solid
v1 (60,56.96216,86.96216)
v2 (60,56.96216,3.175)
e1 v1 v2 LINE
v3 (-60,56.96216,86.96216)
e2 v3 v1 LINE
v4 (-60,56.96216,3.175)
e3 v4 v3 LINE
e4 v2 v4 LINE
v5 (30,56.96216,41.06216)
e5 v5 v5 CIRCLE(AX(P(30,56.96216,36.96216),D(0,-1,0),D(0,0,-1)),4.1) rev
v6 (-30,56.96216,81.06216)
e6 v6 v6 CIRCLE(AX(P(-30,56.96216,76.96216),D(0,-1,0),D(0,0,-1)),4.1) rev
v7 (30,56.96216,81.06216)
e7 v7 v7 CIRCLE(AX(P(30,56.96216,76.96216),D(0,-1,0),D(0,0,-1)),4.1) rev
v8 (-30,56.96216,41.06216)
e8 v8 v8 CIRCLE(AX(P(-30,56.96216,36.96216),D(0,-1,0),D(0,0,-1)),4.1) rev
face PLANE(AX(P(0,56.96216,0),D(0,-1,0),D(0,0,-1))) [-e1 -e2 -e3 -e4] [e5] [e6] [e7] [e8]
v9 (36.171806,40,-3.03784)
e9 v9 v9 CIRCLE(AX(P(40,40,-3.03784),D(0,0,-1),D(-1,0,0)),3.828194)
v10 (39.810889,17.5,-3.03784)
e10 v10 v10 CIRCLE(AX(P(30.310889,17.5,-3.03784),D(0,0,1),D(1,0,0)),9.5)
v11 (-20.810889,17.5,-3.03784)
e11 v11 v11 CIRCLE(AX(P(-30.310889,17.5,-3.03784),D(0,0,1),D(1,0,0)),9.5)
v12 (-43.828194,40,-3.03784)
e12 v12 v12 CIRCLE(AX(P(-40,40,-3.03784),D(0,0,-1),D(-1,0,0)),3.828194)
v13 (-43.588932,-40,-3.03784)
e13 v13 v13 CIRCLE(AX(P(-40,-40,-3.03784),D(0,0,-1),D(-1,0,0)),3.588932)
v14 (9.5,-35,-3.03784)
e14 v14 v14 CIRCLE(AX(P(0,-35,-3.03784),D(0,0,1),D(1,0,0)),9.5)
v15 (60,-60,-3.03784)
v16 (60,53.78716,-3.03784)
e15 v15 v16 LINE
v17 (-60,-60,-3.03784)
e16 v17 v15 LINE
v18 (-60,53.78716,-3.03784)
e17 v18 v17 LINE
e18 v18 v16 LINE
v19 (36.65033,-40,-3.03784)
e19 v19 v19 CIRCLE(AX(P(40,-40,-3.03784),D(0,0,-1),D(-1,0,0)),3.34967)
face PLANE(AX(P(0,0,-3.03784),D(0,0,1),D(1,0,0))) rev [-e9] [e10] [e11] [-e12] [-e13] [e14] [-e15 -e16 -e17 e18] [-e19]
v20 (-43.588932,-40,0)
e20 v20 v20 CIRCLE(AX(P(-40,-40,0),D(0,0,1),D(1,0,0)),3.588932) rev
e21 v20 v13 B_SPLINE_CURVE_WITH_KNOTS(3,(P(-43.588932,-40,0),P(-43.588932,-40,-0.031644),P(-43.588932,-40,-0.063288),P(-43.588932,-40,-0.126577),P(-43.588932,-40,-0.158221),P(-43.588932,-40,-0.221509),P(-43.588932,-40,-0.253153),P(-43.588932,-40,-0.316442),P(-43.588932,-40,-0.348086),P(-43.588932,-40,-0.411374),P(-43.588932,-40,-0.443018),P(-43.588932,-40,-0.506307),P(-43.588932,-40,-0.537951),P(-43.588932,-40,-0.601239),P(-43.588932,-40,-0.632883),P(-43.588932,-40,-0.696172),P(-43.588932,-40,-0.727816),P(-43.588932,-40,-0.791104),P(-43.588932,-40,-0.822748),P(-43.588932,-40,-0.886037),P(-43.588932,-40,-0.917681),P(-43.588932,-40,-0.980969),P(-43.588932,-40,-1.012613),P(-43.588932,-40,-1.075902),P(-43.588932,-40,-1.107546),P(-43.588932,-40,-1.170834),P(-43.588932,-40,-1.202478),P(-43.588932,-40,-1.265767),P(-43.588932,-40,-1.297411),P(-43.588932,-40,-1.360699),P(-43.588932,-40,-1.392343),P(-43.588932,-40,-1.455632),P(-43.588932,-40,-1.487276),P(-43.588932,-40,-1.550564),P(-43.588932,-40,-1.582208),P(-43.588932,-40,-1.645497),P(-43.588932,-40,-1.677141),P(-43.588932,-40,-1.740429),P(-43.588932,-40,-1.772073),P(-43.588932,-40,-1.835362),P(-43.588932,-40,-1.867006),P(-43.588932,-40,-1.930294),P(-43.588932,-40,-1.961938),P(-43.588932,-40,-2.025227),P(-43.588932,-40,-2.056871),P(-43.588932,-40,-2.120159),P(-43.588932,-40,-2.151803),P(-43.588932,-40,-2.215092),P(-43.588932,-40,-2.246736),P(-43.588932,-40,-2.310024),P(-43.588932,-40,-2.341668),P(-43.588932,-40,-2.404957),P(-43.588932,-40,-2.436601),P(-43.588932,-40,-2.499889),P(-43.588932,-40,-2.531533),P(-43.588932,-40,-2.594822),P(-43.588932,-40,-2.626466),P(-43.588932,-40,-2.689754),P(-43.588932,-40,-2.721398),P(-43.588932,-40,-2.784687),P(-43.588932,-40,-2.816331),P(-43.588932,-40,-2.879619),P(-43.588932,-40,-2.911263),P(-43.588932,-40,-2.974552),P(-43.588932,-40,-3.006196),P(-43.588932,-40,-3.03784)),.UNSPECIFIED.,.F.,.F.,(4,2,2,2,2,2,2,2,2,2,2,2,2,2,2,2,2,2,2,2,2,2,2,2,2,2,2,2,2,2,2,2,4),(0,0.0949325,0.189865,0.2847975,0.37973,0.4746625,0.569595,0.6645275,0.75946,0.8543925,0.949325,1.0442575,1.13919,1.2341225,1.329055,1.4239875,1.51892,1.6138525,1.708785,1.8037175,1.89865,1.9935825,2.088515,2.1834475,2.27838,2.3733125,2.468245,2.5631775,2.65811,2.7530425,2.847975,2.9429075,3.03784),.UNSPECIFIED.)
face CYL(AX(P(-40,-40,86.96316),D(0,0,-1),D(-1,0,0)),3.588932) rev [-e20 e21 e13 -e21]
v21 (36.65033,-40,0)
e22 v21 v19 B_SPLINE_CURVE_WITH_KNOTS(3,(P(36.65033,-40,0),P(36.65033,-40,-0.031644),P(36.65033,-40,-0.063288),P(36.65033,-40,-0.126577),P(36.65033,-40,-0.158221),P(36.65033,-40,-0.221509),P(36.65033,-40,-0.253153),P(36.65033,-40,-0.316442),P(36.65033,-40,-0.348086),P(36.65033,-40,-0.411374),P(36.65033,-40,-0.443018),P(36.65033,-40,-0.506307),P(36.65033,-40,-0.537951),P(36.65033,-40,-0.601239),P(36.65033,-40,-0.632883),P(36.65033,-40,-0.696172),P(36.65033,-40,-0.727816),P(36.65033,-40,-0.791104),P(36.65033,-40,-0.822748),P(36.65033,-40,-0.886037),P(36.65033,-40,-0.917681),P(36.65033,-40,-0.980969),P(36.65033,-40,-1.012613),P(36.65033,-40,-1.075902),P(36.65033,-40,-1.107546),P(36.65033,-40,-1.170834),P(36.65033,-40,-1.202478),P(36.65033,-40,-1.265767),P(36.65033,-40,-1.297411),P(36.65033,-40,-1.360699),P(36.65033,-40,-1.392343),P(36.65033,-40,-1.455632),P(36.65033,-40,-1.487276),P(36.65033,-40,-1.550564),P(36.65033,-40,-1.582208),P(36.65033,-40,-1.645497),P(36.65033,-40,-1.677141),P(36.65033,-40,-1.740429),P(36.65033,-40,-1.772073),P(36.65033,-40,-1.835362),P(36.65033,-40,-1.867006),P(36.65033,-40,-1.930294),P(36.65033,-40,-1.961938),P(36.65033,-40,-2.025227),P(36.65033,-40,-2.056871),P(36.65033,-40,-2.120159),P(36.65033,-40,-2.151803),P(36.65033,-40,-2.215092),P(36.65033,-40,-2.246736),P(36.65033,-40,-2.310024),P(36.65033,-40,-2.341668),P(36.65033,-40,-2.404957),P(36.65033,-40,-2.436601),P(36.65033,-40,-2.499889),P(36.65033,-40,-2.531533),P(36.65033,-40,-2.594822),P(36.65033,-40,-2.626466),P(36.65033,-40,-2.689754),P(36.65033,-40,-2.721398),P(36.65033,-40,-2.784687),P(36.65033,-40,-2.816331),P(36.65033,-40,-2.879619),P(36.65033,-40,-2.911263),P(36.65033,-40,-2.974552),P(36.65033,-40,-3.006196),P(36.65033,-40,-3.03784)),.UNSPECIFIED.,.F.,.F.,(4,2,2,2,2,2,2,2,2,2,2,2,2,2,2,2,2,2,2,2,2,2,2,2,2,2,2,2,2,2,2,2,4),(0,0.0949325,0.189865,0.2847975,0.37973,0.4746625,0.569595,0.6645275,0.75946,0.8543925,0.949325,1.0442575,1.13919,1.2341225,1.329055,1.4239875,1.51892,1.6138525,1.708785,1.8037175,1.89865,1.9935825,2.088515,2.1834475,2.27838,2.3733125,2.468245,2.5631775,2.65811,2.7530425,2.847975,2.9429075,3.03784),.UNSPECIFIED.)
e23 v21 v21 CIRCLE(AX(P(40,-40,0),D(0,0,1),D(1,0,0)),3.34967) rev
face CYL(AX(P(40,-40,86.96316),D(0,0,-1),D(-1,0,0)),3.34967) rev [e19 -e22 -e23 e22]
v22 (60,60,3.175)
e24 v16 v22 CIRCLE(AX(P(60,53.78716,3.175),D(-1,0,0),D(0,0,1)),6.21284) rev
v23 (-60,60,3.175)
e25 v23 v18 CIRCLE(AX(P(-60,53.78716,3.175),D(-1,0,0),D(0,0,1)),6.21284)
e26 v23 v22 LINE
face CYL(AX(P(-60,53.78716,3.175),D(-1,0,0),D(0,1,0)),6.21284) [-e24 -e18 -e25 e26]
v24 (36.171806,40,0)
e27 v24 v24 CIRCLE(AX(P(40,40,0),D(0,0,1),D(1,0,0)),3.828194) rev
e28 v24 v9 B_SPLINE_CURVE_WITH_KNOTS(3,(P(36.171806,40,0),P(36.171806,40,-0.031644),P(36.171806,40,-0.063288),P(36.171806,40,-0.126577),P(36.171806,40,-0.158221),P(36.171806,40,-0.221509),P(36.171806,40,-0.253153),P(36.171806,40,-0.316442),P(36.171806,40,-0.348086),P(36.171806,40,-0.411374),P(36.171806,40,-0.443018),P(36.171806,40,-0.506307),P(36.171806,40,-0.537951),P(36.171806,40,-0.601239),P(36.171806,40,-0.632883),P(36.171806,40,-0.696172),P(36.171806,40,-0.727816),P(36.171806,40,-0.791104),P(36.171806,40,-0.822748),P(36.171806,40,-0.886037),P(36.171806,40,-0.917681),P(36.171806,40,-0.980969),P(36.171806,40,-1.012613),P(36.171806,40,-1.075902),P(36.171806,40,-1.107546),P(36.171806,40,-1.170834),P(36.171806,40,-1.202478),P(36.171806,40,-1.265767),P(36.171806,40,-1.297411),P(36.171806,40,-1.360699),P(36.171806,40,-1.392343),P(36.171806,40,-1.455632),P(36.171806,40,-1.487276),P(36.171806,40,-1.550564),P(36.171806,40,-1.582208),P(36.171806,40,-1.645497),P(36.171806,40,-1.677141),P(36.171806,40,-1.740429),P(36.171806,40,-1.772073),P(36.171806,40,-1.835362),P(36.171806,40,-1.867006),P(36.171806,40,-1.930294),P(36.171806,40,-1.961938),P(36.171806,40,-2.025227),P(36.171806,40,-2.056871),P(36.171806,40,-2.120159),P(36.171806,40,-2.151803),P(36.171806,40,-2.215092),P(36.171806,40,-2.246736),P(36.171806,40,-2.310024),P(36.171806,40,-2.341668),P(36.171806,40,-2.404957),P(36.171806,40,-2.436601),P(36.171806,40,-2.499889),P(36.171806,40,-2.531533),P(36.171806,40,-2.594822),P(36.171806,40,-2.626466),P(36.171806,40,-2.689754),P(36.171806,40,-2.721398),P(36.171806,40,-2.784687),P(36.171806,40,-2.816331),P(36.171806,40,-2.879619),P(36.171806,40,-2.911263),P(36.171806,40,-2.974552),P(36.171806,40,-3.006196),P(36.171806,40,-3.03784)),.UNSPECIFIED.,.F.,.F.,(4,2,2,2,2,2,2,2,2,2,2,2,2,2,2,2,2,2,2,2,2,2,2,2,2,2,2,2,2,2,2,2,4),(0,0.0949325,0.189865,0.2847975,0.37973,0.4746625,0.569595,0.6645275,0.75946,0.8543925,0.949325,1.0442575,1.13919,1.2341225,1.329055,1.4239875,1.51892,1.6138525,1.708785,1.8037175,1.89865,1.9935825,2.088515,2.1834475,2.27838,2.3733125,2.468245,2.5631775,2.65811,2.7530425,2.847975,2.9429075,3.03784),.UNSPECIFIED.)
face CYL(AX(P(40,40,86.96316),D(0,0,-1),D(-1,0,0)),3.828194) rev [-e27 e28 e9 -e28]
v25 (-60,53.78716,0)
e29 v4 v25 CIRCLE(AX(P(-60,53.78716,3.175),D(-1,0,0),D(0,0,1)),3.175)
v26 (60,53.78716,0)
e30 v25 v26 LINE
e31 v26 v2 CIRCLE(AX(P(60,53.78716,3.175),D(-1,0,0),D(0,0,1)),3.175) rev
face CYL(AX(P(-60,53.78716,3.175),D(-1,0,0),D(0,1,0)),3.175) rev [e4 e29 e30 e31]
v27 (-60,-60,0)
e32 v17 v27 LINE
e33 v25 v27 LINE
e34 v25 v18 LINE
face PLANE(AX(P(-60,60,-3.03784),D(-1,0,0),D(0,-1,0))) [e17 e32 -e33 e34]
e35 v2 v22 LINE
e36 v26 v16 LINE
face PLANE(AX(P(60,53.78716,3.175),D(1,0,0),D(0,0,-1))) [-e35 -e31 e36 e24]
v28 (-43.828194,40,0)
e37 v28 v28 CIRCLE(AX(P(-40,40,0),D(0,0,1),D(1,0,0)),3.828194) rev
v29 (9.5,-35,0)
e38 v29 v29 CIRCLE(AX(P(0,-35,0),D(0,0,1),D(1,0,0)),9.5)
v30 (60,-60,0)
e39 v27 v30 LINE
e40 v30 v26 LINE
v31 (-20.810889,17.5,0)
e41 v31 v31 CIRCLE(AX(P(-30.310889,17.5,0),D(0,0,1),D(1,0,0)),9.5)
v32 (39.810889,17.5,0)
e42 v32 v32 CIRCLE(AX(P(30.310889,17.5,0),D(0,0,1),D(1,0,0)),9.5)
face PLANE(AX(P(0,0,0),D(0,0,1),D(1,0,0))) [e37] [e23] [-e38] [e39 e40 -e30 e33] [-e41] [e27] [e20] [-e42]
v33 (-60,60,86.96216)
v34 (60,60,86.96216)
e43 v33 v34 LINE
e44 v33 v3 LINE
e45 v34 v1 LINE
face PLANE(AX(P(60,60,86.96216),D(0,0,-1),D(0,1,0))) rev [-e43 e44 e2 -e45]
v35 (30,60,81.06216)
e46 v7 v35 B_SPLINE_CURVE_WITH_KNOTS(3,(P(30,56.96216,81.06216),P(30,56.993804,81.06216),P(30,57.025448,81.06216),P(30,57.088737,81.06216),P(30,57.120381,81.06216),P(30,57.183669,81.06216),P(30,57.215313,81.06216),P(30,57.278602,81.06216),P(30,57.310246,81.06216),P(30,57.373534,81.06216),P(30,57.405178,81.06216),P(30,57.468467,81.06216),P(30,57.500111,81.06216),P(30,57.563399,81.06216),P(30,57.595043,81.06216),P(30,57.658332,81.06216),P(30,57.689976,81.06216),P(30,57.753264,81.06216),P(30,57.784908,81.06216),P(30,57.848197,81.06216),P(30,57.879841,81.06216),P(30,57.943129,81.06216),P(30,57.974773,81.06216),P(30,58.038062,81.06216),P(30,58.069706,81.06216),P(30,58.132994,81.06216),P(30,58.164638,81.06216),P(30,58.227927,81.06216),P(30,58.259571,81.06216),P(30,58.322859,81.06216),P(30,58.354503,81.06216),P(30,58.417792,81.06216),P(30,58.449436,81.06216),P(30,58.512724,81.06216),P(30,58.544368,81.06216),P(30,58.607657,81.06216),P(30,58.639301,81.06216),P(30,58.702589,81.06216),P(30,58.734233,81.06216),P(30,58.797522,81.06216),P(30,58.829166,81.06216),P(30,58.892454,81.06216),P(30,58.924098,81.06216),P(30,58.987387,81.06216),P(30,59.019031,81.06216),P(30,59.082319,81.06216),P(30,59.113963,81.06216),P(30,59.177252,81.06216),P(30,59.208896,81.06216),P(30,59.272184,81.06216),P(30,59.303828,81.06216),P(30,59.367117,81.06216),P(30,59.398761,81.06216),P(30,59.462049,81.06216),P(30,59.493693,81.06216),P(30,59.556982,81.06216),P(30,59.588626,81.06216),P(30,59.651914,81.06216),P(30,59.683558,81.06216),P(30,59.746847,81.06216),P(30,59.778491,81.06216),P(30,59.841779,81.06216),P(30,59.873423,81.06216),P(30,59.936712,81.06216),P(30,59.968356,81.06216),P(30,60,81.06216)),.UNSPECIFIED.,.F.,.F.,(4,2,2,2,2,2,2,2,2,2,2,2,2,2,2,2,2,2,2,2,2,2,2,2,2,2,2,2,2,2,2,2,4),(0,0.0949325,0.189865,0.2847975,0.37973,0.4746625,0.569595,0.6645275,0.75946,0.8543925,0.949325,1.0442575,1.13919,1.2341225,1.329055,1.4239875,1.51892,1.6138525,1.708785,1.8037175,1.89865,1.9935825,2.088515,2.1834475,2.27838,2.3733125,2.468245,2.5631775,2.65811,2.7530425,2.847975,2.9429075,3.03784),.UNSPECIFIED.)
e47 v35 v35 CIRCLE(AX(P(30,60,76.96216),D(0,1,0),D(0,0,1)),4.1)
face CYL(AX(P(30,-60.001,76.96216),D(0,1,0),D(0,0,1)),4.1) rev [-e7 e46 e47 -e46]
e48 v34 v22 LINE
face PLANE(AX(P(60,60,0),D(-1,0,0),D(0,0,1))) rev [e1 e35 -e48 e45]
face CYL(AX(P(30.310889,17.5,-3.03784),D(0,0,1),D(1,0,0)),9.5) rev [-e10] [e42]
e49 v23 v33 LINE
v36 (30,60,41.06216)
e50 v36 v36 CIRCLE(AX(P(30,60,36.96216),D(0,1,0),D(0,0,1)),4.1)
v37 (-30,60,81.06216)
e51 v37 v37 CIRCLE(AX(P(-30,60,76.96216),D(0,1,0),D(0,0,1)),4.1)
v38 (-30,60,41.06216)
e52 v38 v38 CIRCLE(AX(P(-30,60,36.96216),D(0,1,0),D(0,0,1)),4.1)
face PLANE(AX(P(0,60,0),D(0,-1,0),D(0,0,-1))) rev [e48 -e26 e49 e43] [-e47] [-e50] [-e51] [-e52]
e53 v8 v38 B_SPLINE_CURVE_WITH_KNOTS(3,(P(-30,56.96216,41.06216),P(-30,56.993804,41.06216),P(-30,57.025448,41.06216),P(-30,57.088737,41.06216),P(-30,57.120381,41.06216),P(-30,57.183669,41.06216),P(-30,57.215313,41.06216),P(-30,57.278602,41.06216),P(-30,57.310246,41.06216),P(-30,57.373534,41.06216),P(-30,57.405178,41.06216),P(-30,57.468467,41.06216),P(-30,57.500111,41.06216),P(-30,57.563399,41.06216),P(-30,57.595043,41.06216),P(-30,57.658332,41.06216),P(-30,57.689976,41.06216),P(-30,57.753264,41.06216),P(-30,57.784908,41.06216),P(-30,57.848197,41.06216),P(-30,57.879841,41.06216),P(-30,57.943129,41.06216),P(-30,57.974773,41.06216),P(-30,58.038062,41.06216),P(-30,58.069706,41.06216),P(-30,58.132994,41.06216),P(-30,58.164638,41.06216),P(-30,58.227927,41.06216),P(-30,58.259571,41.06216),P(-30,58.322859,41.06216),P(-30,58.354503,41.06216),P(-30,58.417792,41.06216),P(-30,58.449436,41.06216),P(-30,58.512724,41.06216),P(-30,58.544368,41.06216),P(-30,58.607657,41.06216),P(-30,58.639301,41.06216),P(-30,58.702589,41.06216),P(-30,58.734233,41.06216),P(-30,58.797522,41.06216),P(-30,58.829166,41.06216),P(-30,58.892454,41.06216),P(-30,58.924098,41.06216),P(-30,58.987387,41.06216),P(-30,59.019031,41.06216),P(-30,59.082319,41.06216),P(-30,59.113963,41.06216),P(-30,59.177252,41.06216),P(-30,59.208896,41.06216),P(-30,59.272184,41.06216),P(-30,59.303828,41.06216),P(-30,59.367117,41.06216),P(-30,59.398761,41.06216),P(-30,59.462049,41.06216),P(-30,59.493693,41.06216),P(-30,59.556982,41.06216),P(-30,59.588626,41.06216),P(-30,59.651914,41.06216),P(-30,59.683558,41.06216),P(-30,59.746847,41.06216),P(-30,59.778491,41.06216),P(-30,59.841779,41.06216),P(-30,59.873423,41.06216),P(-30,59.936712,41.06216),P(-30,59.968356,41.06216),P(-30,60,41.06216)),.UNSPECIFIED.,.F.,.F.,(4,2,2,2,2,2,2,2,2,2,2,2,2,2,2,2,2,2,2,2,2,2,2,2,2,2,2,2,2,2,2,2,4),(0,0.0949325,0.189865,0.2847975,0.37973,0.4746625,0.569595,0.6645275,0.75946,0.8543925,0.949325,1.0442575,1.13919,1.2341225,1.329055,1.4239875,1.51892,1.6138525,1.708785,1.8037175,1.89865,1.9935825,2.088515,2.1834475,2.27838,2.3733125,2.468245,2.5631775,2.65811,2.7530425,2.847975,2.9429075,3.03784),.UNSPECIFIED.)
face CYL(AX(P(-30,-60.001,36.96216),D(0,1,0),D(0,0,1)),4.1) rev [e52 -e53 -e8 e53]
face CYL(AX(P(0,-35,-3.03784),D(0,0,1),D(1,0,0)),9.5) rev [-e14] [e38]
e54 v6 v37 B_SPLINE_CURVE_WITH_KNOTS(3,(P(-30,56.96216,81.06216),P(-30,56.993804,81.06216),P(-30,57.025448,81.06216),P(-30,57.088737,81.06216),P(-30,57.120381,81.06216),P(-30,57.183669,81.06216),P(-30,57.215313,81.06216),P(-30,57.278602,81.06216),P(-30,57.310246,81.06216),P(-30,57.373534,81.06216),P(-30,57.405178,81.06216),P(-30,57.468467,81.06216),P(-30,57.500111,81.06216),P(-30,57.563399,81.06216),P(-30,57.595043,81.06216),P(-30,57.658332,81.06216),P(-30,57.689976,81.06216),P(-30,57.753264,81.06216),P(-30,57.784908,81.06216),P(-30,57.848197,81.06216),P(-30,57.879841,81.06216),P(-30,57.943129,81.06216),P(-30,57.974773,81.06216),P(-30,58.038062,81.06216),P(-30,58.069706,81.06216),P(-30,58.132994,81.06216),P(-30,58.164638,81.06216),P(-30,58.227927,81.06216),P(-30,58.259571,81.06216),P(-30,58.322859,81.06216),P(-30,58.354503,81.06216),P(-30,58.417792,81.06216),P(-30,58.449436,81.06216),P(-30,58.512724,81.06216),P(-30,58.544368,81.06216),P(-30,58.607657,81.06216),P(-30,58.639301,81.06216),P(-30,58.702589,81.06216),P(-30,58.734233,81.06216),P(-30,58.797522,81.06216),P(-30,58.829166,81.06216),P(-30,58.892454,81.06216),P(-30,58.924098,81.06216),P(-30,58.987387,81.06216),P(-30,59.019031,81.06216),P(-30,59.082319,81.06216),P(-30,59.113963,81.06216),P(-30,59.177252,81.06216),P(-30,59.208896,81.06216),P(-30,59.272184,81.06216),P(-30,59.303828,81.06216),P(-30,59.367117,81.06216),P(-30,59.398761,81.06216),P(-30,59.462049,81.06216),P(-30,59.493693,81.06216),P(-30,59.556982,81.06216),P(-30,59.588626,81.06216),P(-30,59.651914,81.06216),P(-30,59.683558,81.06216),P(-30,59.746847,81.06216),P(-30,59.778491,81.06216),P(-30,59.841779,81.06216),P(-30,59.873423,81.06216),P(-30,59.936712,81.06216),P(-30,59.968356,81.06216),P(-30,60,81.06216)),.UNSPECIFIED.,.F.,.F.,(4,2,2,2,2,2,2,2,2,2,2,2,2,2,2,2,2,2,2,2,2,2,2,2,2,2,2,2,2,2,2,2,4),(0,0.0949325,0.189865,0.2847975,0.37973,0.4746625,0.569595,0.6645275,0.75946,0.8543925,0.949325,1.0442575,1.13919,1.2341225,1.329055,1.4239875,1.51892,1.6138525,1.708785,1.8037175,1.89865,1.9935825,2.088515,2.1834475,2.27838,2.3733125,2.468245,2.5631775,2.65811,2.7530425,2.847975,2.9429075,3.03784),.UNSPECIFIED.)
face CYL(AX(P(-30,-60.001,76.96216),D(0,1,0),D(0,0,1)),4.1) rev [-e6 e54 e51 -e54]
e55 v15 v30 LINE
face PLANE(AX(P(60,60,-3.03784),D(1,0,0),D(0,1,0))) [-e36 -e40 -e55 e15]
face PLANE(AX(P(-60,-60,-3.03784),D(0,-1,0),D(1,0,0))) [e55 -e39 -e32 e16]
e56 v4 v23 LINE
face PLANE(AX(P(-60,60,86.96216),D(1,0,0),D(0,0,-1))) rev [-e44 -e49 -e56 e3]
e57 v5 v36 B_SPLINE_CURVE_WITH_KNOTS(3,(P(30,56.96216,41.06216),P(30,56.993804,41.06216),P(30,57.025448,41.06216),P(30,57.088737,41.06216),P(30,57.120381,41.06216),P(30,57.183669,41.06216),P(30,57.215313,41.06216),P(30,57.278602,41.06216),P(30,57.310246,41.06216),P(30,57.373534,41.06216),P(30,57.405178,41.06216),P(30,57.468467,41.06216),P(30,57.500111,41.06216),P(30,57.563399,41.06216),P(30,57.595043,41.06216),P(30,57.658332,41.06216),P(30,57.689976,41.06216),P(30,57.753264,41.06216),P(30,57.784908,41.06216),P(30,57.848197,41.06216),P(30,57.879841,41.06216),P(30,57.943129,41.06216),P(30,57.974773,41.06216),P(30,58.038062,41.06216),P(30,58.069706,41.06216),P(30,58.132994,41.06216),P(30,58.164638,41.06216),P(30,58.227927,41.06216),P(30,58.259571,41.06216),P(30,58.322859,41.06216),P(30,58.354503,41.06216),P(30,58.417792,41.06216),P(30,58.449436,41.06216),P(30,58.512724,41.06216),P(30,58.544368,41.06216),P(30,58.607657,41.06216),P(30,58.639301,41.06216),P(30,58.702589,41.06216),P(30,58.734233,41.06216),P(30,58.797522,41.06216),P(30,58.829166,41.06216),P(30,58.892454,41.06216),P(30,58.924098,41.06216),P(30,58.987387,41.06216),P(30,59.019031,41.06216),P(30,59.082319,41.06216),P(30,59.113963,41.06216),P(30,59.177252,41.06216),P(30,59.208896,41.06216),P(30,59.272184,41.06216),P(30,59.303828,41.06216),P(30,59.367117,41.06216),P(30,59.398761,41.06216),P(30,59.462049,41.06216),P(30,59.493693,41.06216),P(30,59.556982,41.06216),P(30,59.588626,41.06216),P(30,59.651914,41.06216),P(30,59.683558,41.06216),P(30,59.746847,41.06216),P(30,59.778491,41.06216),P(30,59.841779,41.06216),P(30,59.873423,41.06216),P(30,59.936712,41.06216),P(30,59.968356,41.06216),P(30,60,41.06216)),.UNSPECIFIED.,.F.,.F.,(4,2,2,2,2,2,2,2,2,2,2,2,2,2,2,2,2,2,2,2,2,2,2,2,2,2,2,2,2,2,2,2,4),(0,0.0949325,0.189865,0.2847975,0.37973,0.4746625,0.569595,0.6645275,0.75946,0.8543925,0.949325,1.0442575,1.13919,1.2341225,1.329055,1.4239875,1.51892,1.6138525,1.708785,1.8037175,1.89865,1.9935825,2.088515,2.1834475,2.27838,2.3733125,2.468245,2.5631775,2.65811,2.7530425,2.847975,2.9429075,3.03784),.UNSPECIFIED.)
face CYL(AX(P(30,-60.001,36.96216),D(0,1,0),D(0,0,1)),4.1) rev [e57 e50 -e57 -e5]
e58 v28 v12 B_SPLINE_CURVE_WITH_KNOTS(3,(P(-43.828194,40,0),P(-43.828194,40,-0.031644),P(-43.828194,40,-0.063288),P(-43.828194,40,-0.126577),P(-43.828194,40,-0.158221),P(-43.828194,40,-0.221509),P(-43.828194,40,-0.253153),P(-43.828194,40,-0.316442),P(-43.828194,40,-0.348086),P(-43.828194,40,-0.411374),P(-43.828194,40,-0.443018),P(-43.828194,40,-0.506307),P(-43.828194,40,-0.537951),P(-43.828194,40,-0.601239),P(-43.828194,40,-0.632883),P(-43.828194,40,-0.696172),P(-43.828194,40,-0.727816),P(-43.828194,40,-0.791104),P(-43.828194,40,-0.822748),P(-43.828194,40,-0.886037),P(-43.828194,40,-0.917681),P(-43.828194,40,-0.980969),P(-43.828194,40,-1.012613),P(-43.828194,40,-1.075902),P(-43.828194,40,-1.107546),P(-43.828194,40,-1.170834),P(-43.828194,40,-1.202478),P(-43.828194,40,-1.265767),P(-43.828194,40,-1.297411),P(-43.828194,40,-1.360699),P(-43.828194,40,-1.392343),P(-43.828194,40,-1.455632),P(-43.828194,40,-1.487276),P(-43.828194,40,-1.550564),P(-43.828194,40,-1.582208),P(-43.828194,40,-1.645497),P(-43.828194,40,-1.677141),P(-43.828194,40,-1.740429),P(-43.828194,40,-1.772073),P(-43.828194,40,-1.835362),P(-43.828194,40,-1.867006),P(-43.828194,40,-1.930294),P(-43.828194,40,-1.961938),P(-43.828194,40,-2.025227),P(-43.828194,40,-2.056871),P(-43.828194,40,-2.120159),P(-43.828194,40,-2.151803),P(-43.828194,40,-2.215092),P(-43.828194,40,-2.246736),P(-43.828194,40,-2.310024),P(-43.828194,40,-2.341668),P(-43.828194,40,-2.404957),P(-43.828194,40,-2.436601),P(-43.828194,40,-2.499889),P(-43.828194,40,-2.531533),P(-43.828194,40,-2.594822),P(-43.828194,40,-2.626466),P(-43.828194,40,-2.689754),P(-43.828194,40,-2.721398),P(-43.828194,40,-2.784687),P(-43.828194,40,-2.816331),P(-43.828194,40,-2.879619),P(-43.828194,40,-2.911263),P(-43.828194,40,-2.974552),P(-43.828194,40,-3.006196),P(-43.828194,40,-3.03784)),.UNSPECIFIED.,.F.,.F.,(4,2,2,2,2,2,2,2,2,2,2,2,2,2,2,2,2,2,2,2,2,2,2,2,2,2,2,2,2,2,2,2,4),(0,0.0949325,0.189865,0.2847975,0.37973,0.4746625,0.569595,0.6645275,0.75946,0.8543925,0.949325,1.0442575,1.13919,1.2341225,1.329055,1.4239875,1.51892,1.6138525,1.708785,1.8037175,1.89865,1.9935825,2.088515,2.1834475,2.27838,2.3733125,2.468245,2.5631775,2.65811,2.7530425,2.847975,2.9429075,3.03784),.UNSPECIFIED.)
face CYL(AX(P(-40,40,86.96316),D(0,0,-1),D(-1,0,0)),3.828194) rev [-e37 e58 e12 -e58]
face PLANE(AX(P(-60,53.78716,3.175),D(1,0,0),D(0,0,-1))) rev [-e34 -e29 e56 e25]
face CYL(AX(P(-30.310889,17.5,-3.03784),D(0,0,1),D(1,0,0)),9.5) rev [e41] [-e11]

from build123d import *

# Parameters (mm, degrees)
CROQUIS1_W                       = 120
CROQUIS1_H                       = 120
CROQUIS1_R                       = 9.5
BRIDA_BASE1_DEPTH                = 3.03784
BRIDA_DE_ARISTA1_STRIP_W         = 18.50136
BRIDA_DE_ARISTA1_STRIP_H         = 3.03784
BRIDA_DE_ARISTA1_STRIP_CUT_DEPTH = 120
BRIDA_DE_ARISTA1_DEPTH           = 120
CORTAR_EXTRUIR1_REACH            = 161.883
CROQUIS9_R                       = 4.1
CORTAR_EXTRUIR2_REACH            = 125.693
CROQUIS10_R                      = 3.828194302
CROQUIS10_R_2                    = 3.588932158
CROQUIS10_R_3                    = 3.349670014


# Sheet-metal steps are written as plain solids
with BuildPart() as part:
    # Croquis1 → Brida base1 (new body)
    with BuildSketch(Plane.XY):
        Rectangle(CROQUIS1_W, CROQUIS1_H)
        with Locations((0, -35)):
            Circle(CROQUIS1_R, mode=Mode.SUBTRACT)
        with Locations((-30.310889132, 17.5)):
            Circle(CROQUIS1_R, mode=Mode.SUBTRACT)
        with Locations((30.310889132, 17.5)):
            Circle(CROQUIS1_R, mode=Mode.SUBTRACT)
    extrude(amount=-BRIDA_BASE1_DEPTH)

    # Brida de arista1 strip (across the edge) → Brida de arista1 strip cut (cut)
    with BuildSketch(Plane(origin=(60, 60, 0), x_dir=(0, -1, 0), z_dir=(-1, 0, 0))):
        with Locations((-3.03784, -1.51892)):
            Rectangle(BRIDA_DE_ARISTA1_STRIP_W, BRIDA_DE_ARISTA1_STRIP_H)
    extrude(amount=BRIDA_DE_ARISTA1_STRIP_CUT_DEPTH, mode=Mode.SUBTRACT)

    # Brida de arista1 section (across the edge) → Brida de arista1 (add)
    with BuildSketch(Plane(origin=(60, 60, 0), x_dir=(0, -1, 0), z_dir=(-1, 0, 0))):
        with BuildLine():
            Line((0, 3.175), (0, 86.96216))
            Line((0, 86.96216), (3.03784, 86.96216))
            Line((3.03784, 86.96216), (3.03784, 3.175))
            ThreePointArc((3.03784, 3.175), (3.96777597, 0.92993597), (6.21284, 0))
            Line((6.21284, 0), (6.21284, -3.03784))
            ThreePointArc((6.21284, -3.03784), (1.819698706, -1.218141294), (0, 3.175))
        make_face()
    extrude(amount=BRIDA_DE_ARISTA1_DEPTH)

    # Croquis9 → Cortar-Extruir1 (cut, up to next)
    with BuildSketch(Plane(origin=(0, 60, 0), x_dir=(1, 0, 0), z_dir=(0, 1, 0)), mode=Mode.PRIVATE) as cortar_extruir1_sk1:
        with Locations(Location((-30, -76.96216, 0), (0, 0, 270))):
            Circle(CROQUIS9_R)
    cortar_extruir1_tool1 = extrude(cortar_extruir1_sk1.sketch, amount=-CORTAR_EXTRUIR1_REACH, mode=Mode.PRIVATE) & part.part
    # Croquis9 → Cortar-Extruir1 (cut, up to next)
    with BuildSketch(Plane(origin=(0, 60, 0), x_dir=(1, 0, 0), z_dir=(0, 1, 0)), mode=Mode.PRIVATE) as cortar_extruir1_sk2:
        with Locations(Location((-30, -36.96216, 0), (0, 0, 270))):
            Circle(CROQUIS9_R)
    cortar_extruir1_tool2 = extrude(cortar_extruir1_sk2.sketch, amount=-CORTAR_EXTRUIR1_REACH, mode=Mode.PRIVATE) & part.part
    # Croquis9 → Cortar-Extruir1 (cut, up to next)
    with BuildSketch(Plane(origin=(0, 60, 0), x_dir=(1, 0, 0), z_dir=(0, 1, 0)), mode=Mode.PRIVATE) as cortar_extruir1_sk3:
        with Locations(Location((30, -36.96216, 0), (0, 0, 270))):
            Circle(CROQUIS9_R)
    cortar_extruir1_tool3 = extrude(cortar_extruir1_sk3.sketch, amount=-CORTAR_EXTRUIR1_REACH, mode=Mode.PRIVATE) & part.part
    # Croquis9 → Cortar-Extruir1 (cut, up to next)
    with BuildSketch(Plane(origin=(0, 60, 0), x_dir=(1, 0, 0), z_dir=(0, 1, 0)), mode=Mode.PRIVATE) as cortar_extruir1_sk4:
        with Locations(Location((30, -76.96216, 0), (0, 0, 270))):
            Circle(CROQUIS9_R)
    cortar_extruir1_tool4 = extrude(cortar_extruir1_sk4.sketch, amount=-CORTAR_EXTRUIR1_REACH, mode=Mode.PRIVATE) & part.part
    add(cortar_extruir1_tool1.solids().sort_by_distance((-30, 60, 76.96216))[0], mode=Mode.SUBTRACT)
    add(cortar_extruir1_tool2.solids().sort_by_distance((-30, 60, 36.96216))[0], mode=Mode.SUBTRACT)
    add(cortar_extruir1_tool3.solids().sort_by_distance((30, 60, 36.96216))[0], mode=Mode.SUBTRACT)
    add(cortar_extruir1_tool4.solids().sort_by_distance((30, 60, 76.96216))[0], mode=Mode.SUBTRACT)

    # Croquis10 → Cortar-Extruir2 (cut, up to next)
    with BuildSketch(Plane(origin=(0, 0, -3.03784), x_dir=(-1, 0, 0), z_dir=(0, 0, -1)), mode=Mode.PRIVATE) as cortar_extruir2_sk1:
        with Locations((40, 40)):
            Circle(CROQUIS10_R)
    cortar_extruir2_tool1 = extrude(cortar_extruir2_sk1.sketch, amount=-CORTAR_EXTRUIR2_REACH, mode=Mode.PRIVATE) & part.part
    # Croquis10 → Cortar-Extruir2 (cut, up to next)
    with BuildSketch(Plane(origin=(0, 0, -3.03784), x_dir=(-1, 0, 0), z_dir=(0, 0, -1)), mode=Mode.PRIVATE) as cortar_extruir2_sk2:
        with Locations((40, -40)):
            Circle(CROQUIS10_R_2)
    cortar_extruir2_tool2 = extrude(cortar_extruir2_sk2.sketch, amount=-CORTAR_EXTRUIR2_REACH, mode=Mode.PRIVATE) & part.part
    # Croquis10 → Cortar-Extruir2 (cut, up to next)
    with BuildSketch(Plane(origin=(0, 0, -3.03784), x_dir=(-1, 0, 0), z_dir=(0, 0, -1)), mode=Mode.PRIVATE) as cortar_extruir2_sk3:
        with Locations((-40, -40)):
            Circle(CROQUIS10_R_3)
    cortar_extruir2_tool3 = extrude(cortar_extruir2_sk3.sketch, amount=-CORTAR_EXTRUIR2_REACH, mode=Mode.PRIVATE) & part.part
    # Croquis10 → Cortar-Extruir2 (cut, up to next)
    with BuildSketch(Plane(origin=(0, 0, -3.03784), x_dir=(-1, 0, 0), z_dir=(0, 0, -1)), mode=Mode.PRIVATE) as cortar_extruir2_sk4:
        with Locations((-40, 40)):
            Circle(CROQUIS10_R)
    cortar_extruir2_tool4 = extrude(cortar_extruir2_sk4.sketch, amount=-CORTAR_EXTRUIR2_REACH, mode=Mode.PRIVATE) & part.part
    add(cortar_extruir2_tool1.solids().sort_by_distance((-40, 40, -3.03784))[0], mode=Mode.SUBTRACT)
    add(cortar_extruir2_tool2.solids().sort_by_distance((-40, -40, -3.03784))[0], mode=Mode.SUBTRACT)
    add(cortar_extruir2_tool3.solids().sort_by_distance((40, -40, -3.03784))[0], mode=Mode.SUBTRACT)
    add(cortar_extruir2_tool4.solids().sort_by_distance((40, 40, -3.03784))[0], mode=Mode.SUBTRACT)


solid = part.part
